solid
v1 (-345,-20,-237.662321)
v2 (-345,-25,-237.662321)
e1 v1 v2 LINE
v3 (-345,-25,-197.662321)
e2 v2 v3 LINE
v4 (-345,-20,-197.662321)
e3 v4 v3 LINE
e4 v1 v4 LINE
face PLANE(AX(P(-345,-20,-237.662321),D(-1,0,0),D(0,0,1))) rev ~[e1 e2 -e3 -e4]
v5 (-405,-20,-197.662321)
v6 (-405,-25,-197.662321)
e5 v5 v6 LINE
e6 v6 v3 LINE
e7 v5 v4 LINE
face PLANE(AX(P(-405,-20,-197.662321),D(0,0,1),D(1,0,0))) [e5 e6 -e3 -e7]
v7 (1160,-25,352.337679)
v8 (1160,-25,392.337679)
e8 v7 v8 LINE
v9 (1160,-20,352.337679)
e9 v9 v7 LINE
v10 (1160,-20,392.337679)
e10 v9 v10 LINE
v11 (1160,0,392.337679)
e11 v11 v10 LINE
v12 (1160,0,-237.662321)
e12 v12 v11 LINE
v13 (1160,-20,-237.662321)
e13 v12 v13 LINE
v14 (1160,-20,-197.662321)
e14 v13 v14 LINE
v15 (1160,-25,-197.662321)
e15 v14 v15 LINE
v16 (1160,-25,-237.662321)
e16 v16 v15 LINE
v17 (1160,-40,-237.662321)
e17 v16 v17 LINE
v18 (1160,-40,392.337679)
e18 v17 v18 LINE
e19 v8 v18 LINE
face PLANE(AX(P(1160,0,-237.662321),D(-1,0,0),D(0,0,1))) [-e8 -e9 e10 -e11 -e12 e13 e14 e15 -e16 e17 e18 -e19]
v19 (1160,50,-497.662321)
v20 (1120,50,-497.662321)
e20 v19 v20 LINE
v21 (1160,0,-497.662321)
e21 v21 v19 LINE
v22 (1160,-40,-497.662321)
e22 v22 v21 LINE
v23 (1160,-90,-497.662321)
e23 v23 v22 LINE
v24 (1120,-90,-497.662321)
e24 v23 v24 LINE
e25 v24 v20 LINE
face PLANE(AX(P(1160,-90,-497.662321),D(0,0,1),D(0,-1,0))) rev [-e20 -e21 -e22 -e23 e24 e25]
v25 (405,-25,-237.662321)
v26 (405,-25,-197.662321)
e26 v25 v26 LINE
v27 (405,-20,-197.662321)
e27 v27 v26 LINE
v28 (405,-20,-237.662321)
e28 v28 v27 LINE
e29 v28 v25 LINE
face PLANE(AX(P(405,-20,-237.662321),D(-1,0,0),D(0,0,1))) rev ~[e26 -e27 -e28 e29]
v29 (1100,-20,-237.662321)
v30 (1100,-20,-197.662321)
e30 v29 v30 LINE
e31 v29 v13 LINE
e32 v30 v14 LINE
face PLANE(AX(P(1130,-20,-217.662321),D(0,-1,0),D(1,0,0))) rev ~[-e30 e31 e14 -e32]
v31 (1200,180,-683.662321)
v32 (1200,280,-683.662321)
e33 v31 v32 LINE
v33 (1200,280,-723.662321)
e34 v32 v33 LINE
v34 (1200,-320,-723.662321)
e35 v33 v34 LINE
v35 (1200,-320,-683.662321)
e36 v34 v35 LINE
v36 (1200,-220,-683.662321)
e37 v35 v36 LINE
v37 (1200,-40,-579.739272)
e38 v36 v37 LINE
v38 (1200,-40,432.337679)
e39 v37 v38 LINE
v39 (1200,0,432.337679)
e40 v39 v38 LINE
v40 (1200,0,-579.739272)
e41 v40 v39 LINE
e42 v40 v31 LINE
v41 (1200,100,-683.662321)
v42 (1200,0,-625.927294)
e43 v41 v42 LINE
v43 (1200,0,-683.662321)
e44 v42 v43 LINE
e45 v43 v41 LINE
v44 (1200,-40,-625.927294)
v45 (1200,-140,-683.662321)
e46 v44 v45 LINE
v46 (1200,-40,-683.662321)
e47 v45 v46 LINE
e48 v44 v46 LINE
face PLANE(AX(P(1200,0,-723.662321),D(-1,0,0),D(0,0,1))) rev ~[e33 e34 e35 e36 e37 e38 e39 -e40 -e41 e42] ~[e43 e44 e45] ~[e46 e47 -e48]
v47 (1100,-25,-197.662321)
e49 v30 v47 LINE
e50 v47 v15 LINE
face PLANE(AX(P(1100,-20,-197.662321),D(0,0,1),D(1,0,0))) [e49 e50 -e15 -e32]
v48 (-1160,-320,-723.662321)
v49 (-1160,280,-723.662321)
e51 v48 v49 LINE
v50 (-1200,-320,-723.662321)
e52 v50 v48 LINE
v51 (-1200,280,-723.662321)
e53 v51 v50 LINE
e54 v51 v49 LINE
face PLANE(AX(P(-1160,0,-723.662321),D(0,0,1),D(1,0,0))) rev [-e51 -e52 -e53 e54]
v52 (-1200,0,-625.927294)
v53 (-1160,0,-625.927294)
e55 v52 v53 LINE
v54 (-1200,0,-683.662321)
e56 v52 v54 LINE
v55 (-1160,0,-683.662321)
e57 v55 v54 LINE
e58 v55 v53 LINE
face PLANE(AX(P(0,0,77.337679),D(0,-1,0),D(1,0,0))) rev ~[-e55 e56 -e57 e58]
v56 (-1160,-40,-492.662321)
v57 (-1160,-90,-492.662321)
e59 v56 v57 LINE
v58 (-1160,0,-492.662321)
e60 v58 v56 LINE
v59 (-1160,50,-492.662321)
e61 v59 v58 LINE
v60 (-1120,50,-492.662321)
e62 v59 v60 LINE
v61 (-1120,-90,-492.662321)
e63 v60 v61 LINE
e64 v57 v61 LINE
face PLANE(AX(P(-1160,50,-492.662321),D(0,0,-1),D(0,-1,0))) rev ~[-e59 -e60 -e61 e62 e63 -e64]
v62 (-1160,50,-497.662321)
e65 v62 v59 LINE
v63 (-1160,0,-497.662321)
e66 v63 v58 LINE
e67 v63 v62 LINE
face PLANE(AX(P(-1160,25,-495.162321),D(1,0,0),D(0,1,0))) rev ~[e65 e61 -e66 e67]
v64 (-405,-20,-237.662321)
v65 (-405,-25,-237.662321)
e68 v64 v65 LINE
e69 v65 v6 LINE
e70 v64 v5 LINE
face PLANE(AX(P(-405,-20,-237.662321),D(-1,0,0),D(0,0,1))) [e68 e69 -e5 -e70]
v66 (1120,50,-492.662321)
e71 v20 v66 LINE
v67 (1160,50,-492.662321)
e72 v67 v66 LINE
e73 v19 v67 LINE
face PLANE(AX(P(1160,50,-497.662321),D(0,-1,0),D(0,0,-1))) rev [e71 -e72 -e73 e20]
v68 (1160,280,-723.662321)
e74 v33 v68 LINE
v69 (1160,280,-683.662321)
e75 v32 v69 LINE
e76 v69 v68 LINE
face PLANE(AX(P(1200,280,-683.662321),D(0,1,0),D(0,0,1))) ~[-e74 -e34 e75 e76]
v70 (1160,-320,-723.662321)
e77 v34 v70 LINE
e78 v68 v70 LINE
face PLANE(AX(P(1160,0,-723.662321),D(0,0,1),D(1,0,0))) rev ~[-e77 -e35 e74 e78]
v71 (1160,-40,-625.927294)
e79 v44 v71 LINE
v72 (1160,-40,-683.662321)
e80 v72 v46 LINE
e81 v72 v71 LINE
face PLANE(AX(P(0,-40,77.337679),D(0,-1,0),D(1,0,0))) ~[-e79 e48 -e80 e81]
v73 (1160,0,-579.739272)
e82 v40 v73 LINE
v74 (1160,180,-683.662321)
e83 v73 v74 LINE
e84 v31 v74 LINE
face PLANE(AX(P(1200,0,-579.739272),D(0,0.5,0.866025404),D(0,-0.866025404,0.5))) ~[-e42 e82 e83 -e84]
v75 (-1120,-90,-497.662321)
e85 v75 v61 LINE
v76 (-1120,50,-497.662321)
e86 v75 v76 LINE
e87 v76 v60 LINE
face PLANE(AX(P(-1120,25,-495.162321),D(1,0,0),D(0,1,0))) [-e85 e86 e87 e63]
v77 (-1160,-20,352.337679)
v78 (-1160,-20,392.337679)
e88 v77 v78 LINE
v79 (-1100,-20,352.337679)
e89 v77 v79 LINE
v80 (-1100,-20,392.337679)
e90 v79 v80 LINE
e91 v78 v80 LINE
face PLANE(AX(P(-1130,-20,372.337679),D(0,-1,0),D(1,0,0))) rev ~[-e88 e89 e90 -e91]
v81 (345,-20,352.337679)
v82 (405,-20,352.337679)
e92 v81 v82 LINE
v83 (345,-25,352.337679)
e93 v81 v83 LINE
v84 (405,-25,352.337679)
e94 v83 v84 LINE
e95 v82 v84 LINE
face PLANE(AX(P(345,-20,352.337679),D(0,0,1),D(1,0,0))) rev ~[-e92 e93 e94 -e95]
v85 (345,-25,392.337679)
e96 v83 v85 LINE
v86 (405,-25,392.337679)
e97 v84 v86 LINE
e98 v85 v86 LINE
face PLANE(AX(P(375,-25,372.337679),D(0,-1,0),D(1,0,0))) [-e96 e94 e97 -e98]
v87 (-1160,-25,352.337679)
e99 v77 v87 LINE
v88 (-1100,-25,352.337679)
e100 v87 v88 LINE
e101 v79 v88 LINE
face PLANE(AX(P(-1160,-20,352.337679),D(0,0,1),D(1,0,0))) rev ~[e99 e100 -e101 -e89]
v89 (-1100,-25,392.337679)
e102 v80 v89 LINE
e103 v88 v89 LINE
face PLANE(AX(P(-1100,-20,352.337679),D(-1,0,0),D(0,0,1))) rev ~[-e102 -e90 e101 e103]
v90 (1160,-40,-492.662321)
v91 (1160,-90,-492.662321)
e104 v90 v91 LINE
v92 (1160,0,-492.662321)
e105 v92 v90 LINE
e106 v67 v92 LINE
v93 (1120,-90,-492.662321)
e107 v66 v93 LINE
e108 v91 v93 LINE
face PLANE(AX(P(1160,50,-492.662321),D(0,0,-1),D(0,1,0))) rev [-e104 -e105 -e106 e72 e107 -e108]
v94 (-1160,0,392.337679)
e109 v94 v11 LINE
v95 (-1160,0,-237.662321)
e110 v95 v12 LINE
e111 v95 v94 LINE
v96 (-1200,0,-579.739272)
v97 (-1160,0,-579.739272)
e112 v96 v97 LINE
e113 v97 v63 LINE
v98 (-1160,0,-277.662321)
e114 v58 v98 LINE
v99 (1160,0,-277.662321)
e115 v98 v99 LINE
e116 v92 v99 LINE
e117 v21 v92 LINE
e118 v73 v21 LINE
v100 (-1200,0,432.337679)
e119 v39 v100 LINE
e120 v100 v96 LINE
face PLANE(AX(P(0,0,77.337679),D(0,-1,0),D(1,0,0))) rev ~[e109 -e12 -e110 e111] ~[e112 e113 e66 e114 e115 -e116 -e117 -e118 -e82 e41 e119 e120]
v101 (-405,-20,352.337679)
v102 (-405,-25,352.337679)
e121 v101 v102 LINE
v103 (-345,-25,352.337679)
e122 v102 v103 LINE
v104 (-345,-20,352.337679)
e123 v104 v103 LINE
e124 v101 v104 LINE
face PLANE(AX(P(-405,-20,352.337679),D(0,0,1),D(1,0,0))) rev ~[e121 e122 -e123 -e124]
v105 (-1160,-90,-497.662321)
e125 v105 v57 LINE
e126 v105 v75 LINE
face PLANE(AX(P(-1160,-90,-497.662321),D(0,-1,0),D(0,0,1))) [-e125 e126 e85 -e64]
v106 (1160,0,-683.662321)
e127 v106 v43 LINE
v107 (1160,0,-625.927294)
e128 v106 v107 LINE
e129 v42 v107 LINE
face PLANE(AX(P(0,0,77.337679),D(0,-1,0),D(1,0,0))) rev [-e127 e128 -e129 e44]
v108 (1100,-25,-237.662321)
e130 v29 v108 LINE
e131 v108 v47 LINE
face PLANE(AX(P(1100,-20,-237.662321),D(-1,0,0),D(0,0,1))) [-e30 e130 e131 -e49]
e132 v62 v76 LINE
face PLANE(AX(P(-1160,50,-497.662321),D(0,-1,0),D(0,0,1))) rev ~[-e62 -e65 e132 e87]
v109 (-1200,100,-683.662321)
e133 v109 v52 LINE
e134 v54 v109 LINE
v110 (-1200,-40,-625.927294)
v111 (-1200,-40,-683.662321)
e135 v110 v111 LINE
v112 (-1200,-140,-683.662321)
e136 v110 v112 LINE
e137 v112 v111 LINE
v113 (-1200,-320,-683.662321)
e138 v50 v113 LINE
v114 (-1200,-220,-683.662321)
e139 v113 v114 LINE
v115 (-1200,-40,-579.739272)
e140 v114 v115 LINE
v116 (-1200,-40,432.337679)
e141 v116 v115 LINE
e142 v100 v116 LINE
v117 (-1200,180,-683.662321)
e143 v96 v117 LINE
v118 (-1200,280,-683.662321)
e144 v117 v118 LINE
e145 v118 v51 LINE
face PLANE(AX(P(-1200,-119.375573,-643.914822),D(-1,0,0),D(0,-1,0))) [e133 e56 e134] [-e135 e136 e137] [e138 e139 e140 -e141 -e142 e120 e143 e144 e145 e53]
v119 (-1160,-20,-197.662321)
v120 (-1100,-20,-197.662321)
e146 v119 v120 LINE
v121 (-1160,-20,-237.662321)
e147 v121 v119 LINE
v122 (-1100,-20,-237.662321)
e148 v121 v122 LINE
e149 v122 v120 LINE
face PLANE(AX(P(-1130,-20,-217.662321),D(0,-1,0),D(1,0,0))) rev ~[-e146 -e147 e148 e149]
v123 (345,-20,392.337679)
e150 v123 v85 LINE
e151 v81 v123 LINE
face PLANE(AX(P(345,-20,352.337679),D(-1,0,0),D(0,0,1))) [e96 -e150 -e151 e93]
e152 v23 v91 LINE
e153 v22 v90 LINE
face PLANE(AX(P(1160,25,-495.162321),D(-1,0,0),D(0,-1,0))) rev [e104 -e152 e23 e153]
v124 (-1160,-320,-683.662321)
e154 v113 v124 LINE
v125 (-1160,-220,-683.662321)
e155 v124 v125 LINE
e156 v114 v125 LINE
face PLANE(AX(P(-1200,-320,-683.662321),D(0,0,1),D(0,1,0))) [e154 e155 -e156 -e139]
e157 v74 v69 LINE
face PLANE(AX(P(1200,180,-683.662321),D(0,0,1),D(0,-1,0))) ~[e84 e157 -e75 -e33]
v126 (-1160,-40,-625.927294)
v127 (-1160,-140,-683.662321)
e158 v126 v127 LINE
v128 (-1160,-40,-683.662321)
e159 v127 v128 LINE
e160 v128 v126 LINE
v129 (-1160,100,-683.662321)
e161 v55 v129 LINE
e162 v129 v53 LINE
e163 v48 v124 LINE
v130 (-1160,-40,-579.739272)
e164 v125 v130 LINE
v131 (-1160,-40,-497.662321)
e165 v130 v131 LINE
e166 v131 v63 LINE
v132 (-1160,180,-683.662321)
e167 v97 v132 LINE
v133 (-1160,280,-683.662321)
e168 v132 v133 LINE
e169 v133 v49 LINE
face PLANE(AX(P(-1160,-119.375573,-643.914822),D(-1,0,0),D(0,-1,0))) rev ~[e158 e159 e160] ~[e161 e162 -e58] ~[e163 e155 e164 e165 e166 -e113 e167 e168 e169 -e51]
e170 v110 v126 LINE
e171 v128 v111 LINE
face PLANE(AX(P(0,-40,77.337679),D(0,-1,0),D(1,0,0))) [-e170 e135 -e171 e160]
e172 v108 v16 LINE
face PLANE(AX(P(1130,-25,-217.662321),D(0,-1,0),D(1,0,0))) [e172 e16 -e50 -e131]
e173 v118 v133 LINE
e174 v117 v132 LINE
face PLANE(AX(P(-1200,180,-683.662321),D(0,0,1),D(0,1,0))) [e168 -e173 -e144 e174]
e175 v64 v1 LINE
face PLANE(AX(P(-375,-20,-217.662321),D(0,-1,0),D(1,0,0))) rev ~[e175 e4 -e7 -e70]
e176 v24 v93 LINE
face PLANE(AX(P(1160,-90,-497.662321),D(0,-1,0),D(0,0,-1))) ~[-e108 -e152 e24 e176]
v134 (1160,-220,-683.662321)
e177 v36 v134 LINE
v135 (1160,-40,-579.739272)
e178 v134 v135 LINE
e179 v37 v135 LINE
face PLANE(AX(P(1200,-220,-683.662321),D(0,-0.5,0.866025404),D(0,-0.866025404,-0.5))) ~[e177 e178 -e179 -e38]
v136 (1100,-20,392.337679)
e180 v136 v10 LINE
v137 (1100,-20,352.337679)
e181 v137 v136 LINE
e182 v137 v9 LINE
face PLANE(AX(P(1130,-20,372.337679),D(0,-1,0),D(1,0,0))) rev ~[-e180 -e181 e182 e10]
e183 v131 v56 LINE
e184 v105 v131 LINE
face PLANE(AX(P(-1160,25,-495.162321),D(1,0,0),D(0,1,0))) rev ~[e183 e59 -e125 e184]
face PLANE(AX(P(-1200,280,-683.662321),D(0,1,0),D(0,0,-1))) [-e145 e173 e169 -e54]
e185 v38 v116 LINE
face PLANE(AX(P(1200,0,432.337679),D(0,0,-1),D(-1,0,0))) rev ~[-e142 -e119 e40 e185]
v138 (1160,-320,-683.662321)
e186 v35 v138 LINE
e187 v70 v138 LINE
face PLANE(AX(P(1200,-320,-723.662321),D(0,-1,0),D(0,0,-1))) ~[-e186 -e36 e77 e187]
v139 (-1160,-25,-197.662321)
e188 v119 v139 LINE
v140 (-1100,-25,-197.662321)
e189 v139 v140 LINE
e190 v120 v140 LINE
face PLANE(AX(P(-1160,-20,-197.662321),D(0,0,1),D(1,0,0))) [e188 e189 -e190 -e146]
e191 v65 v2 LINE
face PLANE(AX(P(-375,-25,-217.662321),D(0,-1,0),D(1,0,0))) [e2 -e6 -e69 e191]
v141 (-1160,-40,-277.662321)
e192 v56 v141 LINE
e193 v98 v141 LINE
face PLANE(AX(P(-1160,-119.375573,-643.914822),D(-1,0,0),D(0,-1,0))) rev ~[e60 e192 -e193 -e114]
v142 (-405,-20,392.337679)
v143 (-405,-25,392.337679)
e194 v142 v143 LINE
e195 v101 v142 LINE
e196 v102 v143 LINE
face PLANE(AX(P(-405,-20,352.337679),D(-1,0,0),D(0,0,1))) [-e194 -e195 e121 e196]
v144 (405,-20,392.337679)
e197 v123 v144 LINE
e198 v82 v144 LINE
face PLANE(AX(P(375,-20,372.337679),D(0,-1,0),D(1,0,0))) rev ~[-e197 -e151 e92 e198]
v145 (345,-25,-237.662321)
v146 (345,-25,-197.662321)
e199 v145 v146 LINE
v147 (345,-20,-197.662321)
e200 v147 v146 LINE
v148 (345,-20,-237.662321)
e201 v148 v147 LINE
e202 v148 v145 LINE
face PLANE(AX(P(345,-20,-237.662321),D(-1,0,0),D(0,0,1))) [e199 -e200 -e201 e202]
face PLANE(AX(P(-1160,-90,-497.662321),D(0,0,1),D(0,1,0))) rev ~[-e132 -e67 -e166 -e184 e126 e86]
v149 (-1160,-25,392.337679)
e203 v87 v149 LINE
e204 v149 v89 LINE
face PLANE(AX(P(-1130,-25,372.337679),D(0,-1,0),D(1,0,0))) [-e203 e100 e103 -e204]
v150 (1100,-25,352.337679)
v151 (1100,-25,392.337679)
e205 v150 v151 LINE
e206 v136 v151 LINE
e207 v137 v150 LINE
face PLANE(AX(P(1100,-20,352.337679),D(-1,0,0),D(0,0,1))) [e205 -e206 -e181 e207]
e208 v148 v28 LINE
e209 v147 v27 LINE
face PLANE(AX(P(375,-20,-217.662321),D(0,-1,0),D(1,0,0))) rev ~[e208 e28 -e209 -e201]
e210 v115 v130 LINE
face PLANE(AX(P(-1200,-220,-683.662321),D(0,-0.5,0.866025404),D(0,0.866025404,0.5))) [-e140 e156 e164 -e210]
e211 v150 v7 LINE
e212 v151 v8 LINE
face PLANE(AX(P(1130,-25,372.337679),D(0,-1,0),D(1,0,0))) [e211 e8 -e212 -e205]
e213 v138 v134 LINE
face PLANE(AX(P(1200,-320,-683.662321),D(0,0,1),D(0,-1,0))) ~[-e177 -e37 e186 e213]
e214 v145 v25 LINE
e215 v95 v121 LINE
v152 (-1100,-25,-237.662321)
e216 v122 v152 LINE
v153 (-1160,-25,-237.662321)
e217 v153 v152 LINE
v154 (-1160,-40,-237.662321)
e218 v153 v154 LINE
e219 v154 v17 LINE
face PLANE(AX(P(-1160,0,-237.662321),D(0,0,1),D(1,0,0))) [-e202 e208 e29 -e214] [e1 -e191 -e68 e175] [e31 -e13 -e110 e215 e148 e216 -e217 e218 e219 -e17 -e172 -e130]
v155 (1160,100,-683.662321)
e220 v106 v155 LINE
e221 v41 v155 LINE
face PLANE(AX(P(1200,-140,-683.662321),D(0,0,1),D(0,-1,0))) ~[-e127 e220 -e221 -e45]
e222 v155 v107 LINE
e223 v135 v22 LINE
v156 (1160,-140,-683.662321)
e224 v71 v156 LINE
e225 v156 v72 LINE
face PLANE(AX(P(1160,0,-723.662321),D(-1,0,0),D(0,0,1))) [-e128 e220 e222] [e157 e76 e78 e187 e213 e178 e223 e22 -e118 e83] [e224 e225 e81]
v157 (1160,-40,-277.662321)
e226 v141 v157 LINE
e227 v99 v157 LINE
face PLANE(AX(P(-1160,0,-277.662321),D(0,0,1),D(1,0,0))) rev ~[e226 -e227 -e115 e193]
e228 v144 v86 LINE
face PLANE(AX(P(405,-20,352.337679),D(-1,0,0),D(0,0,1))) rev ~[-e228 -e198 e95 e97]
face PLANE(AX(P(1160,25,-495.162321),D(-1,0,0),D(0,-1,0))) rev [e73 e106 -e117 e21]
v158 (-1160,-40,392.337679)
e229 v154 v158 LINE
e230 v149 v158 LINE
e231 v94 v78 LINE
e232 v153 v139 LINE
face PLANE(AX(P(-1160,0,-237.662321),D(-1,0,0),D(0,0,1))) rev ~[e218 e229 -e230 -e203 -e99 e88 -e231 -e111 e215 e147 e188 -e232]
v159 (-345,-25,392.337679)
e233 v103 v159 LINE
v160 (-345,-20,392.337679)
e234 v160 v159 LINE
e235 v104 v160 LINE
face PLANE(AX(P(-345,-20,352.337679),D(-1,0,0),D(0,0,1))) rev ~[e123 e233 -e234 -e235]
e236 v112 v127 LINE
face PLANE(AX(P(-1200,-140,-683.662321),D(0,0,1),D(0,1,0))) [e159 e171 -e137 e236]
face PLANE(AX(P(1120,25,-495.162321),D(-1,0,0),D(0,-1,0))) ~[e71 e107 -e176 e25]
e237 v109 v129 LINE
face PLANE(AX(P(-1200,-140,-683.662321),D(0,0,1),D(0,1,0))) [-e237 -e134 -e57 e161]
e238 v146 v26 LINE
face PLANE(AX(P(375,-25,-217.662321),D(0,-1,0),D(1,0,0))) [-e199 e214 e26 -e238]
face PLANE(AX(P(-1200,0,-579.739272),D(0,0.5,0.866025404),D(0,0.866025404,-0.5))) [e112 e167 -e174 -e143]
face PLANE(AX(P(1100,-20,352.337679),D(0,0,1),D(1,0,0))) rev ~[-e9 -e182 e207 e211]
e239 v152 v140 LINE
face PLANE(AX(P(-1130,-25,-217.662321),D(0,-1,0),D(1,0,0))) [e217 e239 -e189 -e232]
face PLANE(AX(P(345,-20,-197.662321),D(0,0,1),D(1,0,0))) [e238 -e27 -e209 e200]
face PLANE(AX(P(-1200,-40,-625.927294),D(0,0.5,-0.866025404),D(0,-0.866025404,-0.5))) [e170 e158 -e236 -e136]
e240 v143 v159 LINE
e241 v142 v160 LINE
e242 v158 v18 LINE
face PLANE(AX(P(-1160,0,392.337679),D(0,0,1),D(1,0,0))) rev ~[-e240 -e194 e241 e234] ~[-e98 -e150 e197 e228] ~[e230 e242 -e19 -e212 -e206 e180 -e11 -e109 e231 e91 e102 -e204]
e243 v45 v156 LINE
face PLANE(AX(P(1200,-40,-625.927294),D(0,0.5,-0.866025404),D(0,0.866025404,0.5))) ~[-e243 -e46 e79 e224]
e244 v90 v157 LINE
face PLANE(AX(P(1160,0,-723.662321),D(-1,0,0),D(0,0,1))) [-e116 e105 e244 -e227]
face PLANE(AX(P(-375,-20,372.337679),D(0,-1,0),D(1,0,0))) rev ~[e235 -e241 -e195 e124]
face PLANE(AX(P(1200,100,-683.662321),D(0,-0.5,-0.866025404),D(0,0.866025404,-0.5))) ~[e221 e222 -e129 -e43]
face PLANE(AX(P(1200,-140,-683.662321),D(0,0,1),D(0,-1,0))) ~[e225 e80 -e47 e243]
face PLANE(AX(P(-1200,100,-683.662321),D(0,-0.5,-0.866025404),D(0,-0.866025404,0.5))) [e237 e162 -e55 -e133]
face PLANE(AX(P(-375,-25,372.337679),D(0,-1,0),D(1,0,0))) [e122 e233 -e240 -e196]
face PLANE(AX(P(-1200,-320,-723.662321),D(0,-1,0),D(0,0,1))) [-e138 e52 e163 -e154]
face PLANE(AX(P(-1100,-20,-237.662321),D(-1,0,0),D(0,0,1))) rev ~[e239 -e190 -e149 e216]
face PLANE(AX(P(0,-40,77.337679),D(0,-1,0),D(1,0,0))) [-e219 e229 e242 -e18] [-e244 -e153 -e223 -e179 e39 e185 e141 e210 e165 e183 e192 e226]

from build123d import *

# Parameters (mm, degrees)
F0_W      = 2320
F0_H      = 630
F0_W_2    = 40
F0_H_2    = 446
F1_DEPTH  = 40
F2_W      = 40
F2_H      = 40
F3_DEPTH  = 40
F4_W      = 50
F4_H      = 5
F4_W_2    = 40
F5_DEPTH  = 40
F9_W      = 60
F9_H      = 40
F10_DEPTH = 5


# Not quite as in the source:
# - a feature names something its author has since deleted; it is built from what else it names


with BuildPart() as f1:
    # F0 (on Front) → F1 (new body)
    with BuildSketch(Plane.XZ):
        Polygon((1200, 432.3376794357), (-1200, 432.3376794357), (-1200, -277.6623205643), (-1160, -277.6623205643), (1160, -277.6623205643), (1200, -277.6623205643), align=None)
        with Locations((0, 77.3376794357)):
            Rectangle(F0_W, F0_H, mode=Mode.SUBTRACT)
        with Locations((1180, -500.6623205643)):
            Rectangle(F0_W_2, F0_H_2)
        with Locations((-1180, -500.6623205643)):
            Rectangle(F0_W_2, F0_H_2)
    extrude(amount=F1_DEPTH)

    # F2 (on face) → F3 (join)
    with BuildSketch(Plane(origin=(-1200, 0, 0), x_dir=(0, -1, 0), z_dir=(-1, 0, 0))):
        Polygon((40, -625.9272936454), (140, -683.6623205643), (220, -683.6623205643), (40, -579.7392721102), align=None)
        Polygon((0, -579.7392721102), (-180, -683.6623205643), (-100, -683.6623205643), (0, -625.9272936454), align=None)
        Polygon((-280, -683.6623205643), (-280, -723.6623205643), (0, -723.6623205643), (0, -683.6623205643), (-100, -683.6623205643), (-180, -683.6623205643), align=None)
        Polygon((40, -683.6623205643), (40, -723.6623205643), (320, -723.6623205643), (320, -683.6623205643), (220, -683.6623205643), (140, -683.6623205643), align=None)
        with Locations((20, -703.6623205643)):
            Rectangle(F2_W, F2_H)
    extrude(amount=-F3_DEPTH)

    # F4 (on face) → F5 (join)
    with BuildSketch(Plane.YZ.offset(-1160)):
        with Locations((25, -495.1623205643)):
            Rectangle(F4_W, F4_H)
        with Locations((-20, -495.1623205643)):
            Rectangle(F4_W_2, F4_H)
        with Locations((-65, -495.1623205643)):
            Rectangle(F4_W, F4_H)
    extrude(amount=F5_DEPTH)

    # F6: F1 across plane


with BuildPart() as f1_1:
    add(f1.part)
    add(f1.part.mirror(Plane.YZ))

    # F7: F1 across plane


with BuildPart() as f1_2:
    add(f1_1.part)
    add(f1_1.part.mirror(Plane.YZ))

    # F9 (on offset) → F10 (join)
    with BuildSketch(Plane.XZ.offset(20)):
        with Locations((-1130, -217.6623205643)):
            Rectangle(F9_W, F9_H)
        with Locations((-1130, 372.3376794357)):
            Rectangle(F9_W, F9_H)
        with Locations((-375, 372.3376794357)):
            Rectangle(F9_W, F9_H)
        with Locations((-375, -217.6623205643)):
            Rectangle(F9_W, F9_H)
        with Locations((375, -217.6623205643)):
            Rectangle(F9_W, F9_H)
        with Locations((375, 372.3376794357)):
            Rectangle(F9_W, F9_H)
        with Locations((1130, 372.3376794357)):
            Rectangle(F9_W, F9_H)
        with Locations((1130, -217.6623205643)):
            Rectangle(F9_W, F9_H)
    extrude(amount=F10_DEPTH)


solid = f1_2.part
